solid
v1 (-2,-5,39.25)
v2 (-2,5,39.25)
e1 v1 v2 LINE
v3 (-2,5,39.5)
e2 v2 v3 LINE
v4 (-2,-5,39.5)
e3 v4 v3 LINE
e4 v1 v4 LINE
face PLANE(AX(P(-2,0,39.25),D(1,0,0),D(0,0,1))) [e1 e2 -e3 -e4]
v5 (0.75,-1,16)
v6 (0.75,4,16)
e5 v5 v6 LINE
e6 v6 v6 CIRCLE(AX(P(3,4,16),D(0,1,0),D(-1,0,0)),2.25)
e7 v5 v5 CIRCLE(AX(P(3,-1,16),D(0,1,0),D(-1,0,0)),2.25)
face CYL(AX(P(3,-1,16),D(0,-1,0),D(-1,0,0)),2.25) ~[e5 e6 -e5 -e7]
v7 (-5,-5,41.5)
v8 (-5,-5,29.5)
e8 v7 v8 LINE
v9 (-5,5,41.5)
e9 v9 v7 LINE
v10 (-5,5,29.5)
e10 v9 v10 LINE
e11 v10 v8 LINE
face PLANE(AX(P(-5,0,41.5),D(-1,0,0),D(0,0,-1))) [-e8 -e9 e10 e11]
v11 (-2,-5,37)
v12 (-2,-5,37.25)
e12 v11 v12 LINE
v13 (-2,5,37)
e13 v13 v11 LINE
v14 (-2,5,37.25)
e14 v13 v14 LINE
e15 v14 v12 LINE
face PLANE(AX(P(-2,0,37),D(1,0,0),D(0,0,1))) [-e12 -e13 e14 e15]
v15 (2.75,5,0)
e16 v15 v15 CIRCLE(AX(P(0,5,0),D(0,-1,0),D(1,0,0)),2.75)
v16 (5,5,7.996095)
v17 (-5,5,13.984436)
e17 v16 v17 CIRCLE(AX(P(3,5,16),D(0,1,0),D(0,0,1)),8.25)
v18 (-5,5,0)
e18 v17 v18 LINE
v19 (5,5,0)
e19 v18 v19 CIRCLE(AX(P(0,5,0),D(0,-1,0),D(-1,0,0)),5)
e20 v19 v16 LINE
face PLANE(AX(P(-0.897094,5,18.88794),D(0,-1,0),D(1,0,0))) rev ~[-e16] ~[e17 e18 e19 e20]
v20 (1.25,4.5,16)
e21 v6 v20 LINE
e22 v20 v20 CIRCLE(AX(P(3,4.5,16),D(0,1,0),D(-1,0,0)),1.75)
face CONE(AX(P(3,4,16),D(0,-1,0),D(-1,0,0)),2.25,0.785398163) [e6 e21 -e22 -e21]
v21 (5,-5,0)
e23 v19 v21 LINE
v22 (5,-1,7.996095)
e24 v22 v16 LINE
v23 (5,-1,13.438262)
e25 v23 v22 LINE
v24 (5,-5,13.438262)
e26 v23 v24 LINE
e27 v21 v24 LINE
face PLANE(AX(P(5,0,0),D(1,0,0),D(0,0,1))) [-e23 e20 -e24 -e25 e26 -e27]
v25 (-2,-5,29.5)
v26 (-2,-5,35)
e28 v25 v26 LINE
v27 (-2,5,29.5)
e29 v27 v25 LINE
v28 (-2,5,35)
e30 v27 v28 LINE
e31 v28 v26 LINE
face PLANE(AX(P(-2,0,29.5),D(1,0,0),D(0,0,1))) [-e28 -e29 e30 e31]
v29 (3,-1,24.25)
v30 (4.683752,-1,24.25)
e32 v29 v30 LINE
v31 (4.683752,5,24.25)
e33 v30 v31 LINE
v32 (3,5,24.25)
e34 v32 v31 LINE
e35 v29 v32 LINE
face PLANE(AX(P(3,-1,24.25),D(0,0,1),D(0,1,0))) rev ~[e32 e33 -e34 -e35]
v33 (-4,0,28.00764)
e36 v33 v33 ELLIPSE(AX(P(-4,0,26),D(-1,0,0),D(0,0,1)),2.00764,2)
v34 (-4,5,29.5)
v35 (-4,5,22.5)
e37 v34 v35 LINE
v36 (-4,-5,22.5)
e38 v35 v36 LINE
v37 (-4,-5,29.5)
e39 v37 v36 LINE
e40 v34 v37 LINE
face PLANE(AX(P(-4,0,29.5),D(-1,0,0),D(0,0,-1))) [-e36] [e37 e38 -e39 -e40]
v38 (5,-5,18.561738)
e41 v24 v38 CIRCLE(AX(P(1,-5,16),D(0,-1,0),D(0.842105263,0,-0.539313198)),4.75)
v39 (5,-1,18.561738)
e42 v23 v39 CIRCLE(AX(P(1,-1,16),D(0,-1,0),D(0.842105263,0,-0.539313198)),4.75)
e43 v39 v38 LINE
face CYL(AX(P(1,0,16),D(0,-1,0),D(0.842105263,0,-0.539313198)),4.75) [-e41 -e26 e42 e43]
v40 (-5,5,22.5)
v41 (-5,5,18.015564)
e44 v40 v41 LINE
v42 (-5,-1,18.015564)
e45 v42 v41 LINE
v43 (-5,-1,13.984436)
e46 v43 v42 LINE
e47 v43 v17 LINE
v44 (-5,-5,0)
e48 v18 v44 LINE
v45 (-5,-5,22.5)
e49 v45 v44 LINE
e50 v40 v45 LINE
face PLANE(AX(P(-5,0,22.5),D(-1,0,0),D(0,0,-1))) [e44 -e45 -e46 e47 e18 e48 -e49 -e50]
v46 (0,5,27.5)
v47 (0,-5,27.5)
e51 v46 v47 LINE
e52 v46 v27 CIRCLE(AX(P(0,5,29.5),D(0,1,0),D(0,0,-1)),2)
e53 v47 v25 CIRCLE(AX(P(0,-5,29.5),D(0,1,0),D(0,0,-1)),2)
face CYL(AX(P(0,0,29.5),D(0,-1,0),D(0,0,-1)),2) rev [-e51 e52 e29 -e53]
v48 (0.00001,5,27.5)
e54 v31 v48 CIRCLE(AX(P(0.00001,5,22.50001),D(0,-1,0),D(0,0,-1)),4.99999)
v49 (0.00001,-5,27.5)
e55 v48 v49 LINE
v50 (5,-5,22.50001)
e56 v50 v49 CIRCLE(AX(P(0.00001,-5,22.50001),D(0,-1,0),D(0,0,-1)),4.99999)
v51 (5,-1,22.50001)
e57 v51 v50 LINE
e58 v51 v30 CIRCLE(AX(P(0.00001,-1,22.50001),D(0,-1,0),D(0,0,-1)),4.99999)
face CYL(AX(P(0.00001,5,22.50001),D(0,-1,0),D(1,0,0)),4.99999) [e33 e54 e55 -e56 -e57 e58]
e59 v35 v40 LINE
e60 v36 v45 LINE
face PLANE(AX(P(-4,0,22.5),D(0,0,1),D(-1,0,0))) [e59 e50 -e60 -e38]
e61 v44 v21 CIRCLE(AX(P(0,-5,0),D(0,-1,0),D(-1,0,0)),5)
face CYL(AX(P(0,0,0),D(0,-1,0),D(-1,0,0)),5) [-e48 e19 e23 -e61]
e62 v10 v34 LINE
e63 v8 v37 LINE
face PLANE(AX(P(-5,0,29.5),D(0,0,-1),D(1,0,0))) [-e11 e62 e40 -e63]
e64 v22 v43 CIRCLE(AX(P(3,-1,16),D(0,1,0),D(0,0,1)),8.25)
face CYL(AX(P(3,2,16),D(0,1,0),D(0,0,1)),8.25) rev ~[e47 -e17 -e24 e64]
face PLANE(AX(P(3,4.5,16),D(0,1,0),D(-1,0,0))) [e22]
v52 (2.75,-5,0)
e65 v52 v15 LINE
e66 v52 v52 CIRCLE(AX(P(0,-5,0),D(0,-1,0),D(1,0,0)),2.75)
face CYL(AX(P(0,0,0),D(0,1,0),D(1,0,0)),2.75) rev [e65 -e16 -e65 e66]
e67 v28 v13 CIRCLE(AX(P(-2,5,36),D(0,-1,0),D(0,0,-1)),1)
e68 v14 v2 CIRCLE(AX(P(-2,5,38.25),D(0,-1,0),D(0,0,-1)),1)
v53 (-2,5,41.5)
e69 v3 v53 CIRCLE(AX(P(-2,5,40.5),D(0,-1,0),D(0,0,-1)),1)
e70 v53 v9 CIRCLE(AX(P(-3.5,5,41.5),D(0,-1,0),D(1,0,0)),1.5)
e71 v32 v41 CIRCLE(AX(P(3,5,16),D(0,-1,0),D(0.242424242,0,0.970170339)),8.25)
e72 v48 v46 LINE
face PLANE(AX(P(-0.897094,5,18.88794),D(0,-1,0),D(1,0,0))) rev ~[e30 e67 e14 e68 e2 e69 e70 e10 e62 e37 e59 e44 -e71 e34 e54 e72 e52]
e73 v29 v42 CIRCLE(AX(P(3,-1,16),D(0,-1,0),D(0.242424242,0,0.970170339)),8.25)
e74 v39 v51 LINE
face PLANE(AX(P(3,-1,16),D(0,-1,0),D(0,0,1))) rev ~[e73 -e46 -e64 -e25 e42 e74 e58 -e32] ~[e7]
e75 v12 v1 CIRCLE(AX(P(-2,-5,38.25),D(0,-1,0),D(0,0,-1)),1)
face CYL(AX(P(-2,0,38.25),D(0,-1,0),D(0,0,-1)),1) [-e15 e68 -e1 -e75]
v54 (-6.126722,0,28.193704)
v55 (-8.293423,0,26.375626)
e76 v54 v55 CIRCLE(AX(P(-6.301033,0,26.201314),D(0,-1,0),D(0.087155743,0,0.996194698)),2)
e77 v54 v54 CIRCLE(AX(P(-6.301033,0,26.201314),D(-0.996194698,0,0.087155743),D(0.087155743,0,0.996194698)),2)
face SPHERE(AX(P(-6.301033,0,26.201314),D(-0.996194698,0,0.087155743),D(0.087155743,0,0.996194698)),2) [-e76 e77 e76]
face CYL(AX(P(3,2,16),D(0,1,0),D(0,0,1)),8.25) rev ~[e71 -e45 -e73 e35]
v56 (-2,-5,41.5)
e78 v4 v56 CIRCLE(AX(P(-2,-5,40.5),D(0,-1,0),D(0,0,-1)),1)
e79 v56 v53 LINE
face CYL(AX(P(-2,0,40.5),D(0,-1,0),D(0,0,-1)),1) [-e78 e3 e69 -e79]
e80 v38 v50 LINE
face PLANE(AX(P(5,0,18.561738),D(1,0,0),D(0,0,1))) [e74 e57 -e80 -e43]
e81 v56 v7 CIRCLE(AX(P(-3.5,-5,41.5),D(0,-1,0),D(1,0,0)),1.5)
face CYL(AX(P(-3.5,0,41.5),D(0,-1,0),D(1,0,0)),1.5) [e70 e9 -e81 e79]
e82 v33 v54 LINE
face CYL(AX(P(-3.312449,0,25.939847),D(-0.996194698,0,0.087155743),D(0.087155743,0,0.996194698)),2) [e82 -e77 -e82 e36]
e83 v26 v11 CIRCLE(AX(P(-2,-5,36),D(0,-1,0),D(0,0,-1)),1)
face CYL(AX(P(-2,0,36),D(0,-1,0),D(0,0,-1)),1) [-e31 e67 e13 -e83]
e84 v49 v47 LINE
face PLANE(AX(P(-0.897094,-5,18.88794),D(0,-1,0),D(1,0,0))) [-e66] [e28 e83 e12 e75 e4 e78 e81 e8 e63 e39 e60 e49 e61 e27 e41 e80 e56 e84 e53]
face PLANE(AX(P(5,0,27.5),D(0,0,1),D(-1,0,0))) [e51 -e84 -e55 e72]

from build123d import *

# Parameters (mm, degrees)
F0_R      = 2.75
F1_DEPTH  = 5
F5_W      = 6
F5_H      = 8.25
F7_DEPTH  = 2.751
F8_R      = 4.99999
F9_R      = 2.25
F10_DEPTH = 5.5
F11_SIZE  = 0.5


# Not quite as in the source:
# - a fillet or chamfer is up to 0.001 mm smaller than in the source, because OpenCascade refuses the exact size


with BuildPart() as f1:
    # F0 (on Front) → F1 (new body, symmetric)
    with BuildSketch(Plane.XZ):
        with BuildLine():
            ThreePointArc((-2, 41.5), (-3.5, 43), (-5, 41.5))
            Line((-5, 41.5), (-5, 29.5))
            Line((-5, 29.5), (-4, 29.5))
            Line((-4, 29.5), (-4, 22.5))
            Line((-4, 22.5), (-5, 22.5))
            Line((-5, 22.5), (-5, 0))
            ThreePointArc((-5, 0), (0, -5), (5, 0))
            Line((5, 0), (5, 13.4382623085))
            ThreePointArc((5, 13.4382623085), (5.75, 16), (5, 18.5617376915))
            Line((5, 18.5617376915), (5, 27.5))
            Line((5, 27.5), (0, 27.5))
            ThreePointArc((0, 27.5), (-1.4142135624, 28.0857864376), (-2, 29.5))
            Line((-2, 29.5), (-2, 35))
            Line((-2, 35), (-2, 37))
            Line((-2, 37), (-2, 37.25))
            Line((-2, 37.25), (-2, 39.25))
            Line((-2, 39.25), (-2, 39.5))
            Line((-2, 39.5), (-2, 41.5))
        make_face()
        Circle(F0_R, mode=Mode.SUBTRACT)
        with BuildLine():
            ThreePointArc((-2, 39.5), (-1, 40.5), (-2, 41.5))
            Line((-2, 41.5), (-2, 39.5))
        make_face()
        with BuildLine():
            ThreePointArc((-2, 37.25), (-1, 38.25), (-2, 39.25))
            Line((-2, 39.25), (-2, 37.25))
        make_face()
        with BuildLine():
            ThreePointArc((-2, 35), (-1, 36), (-2, 37))
            Line((-2, 37), (-2, 35))
        make_face()
    extrude(amount=F1_DEPTH, both=True)

    # F2 (on Front) → F3 (revolve)
    with BuildSketch(Plane.XZ):
        with BuildLine():
            Line((-3.3124492232, 25.9398471014), (-3.1381377377, 27.9322364976))
            Line((-3.1381377377, 27.9322364976), (-6.126721832, 28.1937037259))
            ThreePointArc((-6.126721832, 28.1937037259), (-7.5866085368, 27.7334032159), (-8.2934227136, 26.3756258152))
            Line((-8.2934227136, 26.3756258152), (-3.3124492232, 25.9398471014))
        make_face()
    revolve(axis=Axis((-3.9560072501, 0, 25.9961511331), (-0.9961946981, 0, 0.0871557427)))

    # F5 (on offset) → F6 (revolve, cut)
    with BuildSketch(Plane.YZ.offset(3)):
        with Locations((2, 20.125)):
            Rectangle(F5_W, F5_H)
    revolve(axis=Axis((3, 0.0511605343, 16), (0, 1, 0)), mode=Mode.SUBTRACT)

    # F5 (on offset) → F7 (cut, through all)
    with BuildSketch(Plane.YZ.offset(3)):
        with Locations((2, 20.125)):
            Rectangle(F5_W, F5_H)
    extrude(amount=F7_DEPTH, mode=Mode.SUBTRACT)

    # F8 (radius 5 in the source; OpenCascade refuses exactly that, so slightly less here)
    f8_edges = [f1.edges().sort_by_distance(p)[0] for p in [
        (5, 0, 27.5),
    ]]
    fillet(f8_edges, radius=F8_R)

    # F9 (on face) → F10 (join)
    with BuildSketch(Plane(origin=(0, -1, 0), x_dir=(-1, 0, 0), z_dir=(0, 1, 0))):
        with Locations((-3, 16)):
            Circle(F9_R)
    extrude(amount=F10_DEPTH)

    # F11
    f11_edges = [f1.edges().sort_by_distance(p)[0] for p in [
        (5.25, 4.5, 16),
    ]]
    chamfer(f11_edges, length=F11_SIZE)


solid = f1.part
